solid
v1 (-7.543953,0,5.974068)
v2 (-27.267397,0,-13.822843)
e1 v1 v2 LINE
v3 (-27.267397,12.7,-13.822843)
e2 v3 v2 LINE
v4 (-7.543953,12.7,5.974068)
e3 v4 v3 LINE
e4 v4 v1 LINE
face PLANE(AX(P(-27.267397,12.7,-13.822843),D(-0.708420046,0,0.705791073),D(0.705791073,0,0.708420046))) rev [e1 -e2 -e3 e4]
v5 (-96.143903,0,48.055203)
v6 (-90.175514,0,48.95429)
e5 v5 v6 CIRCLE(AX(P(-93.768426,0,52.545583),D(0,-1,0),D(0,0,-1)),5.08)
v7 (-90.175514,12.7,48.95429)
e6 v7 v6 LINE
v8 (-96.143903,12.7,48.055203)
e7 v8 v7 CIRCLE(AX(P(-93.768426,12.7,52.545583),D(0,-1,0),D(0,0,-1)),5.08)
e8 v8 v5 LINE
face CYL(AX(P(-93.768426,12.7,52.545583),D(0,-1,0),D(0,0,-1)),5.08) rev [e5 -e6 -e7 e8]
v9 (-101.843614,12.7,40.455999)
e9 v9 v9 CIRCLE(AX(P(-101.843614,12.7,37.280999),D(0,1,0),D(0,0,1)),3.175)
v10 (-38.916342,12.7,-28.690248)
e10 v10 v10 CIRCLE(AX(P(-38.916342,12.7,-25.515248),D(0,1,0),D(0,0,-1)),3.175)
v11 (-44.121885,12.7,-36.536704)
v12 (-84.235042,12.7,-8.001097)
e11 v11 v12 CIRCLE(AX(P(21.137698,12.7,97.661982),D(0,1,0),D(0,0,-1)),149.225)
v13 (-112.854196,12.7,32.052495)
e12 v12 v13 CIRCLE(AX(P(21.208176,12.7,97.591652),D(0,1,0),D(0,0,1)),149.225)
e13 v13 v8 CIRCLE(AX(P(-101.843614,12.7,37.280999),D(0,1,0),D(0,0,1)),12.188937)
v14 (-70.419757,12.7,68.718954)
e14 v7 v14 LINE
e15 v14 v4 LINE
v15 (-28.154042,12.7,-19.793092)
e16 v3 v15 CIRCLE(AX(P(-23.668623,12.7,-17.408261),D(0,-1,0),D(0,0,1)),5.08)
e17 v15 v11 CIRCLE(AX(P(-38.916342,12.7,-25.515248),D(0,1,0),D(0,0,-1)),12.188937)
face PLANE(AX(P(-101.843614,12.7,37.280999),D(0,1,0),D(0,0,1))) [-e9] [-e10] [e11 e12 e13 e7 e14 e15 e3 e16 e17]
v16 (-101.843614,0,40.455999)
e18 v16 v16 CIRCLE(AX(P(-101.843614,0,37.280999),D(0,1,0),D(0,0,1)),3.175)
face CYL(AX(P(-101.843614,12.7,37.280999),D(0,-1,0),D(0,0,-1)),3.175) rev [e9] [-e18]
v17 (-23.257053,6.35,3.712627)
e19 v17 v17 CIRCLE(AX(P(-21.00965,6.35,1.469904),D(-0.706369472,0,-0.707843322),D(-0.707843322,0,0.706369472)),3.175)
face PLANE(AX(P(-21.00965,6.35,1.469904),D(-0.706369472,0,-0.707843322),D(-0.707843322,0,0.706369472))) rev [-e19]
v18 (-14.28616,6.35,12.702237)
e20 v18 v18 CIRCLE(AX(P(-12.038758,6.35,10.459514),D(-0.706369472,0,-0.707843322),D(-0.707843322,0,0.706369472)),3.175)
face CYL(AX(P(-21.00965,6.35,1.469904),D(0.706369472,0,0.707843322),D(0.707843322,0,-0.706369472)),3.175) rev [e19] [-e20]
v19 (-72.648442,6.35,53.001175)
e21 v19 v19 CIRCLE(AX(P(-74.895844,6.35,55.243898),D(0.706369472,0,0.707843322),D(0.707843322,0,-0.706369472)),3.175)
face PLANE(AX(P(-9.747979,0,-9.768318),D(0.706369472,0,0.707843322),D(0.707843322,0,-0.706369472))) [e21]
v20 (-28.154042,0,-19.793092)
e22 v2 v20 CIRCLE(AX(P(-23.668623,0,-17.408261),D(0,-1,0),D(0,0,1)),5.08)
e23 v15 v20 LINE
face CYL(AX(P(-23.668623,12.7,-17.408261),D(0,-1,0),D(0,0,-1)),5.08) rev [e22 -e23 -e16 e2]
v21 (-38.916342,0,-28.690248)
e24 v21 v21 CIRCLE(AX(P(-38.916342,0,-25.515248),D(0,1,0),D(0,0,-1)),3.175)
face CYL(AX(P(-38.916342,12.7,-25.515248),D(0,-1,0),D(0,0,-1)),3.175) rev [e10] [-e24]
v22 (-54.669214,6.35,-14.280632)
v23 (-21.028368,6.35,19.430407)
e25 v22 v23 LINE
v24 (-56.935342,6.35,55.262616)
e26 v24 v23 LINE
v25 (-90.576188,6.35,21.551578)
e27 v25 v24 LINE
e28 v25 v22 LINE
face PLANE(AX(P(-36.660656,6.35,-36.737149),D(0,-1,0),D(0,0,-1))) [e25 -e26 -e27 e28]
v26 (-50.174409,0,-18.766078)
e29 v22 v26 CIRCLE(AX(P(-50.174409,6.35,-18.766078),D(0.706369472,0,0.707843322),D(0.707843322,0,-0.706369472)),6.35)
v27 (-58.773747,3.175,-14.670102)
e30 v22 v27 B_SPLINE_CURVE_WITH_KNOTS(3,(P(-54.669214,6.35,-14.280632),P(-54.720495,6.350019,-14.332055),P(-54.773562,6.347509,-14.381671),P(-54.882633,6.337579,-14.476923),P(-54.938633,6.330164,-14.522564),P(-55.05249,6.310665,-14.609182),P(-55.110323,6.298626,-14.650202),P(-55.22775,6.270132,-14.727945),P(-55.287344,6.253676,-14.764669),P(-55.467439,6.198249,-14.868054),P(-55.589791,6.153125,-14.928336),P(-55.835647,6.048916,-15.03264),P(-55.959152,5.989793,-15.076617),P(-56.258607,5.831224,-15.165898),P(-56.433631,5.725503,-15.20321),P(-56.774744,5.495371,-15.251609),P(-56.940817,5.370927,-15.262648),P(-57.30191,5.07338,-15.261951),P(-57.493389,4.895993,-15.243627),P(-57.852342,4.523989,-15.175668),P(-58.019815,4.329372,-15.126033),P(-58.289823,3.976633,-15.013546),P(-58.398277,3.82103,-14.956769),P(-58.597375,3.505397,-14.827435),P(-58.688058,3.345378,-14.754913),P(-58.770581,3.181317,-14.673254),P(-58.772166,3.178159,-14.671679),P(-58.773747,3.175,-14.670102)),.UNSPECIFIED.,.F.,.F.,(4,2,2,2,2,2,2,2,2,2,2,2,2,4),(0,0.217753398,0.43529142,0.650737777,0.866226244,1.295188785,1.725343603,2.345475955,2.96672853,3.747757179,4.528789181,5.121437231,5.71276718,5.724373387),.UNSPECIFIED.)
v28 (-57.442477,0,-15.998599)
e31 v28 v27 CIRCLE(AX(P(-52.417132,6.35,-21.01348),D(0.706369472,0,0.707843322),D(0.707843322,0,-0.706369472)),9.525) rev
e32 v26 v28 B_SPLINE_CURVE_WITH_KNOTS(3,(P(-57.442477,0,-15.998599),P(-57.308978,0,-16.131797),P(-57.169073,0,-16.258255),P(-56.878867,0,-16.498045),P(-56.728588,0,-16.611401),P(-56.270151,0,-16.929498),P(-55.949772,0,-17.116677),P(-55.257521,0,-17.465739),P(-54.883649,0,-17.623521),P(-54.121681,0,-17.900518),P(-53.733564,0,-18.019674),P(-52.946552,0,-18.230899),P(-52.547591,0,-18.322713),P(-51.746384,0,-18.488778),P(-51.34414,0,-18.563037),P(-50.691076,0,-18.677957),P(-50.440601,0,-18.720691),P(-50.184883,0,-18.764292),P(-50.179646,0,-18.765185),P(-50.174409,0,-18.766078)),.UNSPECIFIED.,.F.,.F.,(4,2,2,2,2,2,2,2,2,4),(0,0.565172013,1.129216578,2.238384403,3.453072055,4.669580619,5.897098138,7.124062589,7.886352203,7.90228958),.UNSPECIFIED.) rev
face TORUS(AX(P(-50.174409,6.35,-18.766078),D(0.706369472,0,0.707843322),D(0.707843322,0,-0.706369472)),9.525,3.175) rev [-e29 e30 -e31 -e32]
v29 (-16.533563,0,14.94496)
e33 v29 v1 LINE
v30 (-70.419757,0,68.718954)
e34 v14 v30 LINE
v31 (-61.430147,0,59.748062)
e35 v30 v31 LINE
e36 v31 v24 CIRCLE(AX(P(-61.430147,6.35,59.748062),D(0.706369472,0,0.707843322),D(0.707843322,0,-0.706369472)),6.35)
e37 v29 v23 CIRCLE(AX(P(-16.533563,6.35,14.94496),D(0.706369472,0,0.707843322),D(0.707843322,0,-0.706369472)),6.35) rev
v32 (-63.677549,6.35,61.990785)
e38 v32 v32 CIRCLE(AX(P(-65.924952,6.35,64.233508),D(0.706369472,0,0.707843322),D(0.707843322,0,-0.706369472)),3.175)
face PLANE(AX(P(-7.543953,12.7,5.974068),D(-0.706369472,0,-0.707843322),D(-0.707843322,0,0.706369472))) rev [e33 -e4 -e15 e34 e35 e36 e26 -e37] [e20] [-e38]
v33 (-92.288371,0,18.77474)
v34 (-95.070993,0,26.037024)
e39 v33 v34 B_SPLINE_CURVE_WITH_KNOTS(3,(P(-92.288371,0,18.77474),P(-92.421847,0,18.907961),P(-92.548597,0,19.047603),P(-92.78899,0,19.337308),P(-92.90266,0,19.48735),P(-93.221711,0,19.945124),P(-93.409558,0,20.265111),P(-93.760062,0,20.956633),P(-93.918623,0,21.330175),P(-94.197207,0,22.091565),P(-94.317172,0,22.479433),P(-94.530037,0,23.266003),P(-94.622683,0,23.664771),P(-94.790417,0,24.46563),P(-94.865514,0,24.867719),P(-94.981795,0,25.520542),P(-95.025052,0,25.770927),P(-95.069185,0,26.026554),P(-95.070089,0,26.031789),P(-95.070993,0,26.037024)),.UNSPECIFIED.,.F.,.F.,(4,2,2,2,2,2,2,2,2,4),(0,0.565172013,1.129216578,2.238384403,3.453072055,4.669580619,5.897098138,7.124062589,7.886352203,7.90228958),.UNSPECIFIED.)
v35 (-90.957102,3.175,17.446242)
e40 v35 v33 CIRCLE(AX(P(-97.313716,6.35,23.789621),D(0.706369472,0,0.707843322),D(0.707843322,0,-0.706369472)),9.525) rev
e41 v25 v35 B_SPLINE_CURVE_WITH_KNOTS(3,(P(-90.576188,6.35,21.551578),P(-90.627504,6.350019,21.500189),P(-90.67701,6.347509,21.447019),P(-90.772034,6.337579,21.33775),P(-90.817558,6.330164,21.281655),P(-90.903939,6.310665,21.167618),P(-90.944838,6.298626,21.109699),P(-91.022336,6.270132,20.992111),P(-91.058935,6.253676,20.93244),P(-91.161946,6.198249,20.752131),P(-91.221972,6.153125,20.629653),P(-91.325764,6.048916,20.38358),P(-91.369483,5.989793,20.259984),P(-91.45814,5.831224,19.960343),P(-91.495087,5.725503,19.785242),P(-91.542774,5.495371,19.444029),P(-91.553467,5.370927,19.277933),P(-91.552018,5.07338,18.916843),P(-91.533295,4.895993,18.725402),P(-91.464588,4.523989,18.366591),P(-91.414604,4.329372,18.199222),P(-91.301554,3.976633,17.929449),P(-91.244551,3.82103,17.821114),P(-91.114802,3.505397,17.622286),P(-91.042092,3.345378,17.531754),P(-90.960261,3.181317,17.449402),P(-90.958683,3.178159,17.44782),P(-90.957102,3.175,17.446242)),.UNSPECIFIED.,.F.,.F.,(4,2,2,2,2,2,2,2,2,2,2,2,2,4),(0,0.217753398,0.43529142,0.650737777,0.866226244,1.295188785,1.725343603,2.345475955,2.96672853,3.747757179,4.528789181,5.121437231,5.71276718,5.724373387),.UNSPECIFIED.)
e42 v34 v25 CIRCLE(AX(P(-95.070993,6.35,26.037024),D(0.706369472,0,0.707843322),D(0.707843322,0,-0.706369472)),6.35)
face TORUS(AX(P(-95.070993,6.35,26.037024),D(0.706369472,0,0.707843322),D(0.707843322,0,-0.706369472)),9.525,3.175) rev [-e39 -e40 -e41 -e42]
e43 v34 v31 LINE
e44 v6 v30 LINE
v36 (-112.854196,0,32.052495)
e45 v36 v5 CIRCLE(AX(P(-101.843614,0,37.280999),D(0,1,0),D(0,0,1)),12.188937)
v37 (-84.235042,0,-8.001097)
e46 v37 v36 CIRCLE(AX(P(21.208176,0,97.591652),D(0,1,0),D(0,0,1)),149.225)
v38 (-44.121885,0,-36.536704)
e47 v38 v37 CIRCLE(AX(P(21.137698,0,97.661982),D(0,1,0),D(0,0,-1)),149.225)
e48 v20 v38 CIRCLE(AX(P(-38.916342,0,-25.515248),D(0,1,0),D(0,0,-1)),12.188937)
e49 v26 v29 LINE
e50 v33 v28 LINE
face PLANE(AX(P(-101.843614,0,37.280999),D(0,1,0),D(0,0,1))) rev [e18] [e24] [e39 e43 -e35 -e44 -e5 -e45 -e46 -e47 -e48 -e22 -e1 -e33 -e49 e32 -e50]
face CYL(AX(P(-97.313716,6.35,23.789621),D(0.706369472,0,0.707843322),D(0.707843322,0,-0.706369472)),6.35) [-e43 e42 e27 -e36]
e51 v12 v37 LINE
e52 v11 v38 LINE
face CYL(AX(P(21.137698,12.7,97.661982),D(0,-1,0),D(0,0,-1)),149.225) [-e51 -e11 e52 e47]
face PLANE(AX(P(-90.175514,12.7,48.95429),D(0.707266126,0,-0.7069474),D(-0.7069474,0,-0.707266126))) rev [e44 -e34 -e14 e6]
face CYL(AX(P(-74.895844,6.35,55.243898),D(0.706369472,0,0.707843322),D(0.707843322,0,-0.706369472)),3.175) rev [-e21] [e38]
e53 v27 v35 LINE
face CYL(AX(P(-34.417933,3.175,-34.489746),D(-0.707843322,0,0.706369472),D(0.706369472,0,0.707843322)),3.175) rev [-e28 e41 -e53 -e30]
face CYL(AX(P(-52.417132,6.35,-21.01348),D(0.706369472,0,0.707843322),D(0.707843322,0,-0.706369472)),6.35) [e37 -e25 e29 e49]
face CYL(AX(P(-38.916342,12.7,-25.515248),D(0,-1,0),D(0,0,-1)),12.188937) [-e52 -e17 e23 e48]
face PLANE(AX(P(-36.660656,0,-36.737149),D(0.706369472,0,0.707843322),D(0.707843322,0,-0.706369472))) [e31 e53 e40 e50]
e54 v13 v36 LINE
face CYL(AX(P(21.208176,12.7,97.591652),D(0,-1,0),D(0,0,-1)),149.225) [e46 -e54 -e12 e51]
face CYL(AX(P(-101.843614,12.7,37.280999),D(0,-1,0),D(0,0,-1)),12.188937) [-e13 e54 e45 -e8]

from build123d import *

# Parameters (mm, degrees)
SKETCH10_R                   = 3.175
BOSS_EXTRUDE1_DEPTH          = 12.7
SKETCH13_R                   = 3.175
TAPPED_HOLE_FOR_LID_DEPTH    = 12.7
CUT_TO_DECREASE_MASS_DEPTH   = 50.8
EIGTH_INCH_INTERNAL_FILLET_R = 3.175


with BuildPart() as part:
    # Sketch10 → Boss-Extrude1 (new body)
    with BuildSketch(Plane(origin=(0, 0, 0), x_dir=(1, 0, 0), z_dir=(0, 1, 0))):
        with BuildLine():
            Line((-7.543952838, -5.974068145), (-70.419757016, -68.718954232))
            Line((-70.419757016, -68.718954232), (-90.175514458, -48.954289951))
            ThreePointArc((-90.175514458, -48.954289951), (-93.011705319, -47.522259817), (-96.143902741, -48.0552028))
            ThreePointArc((-96.143902741, -48.0552028), (-110.274094487, -46.08424648), (-112.854196125, -32.052494517))
            ThreePointArc((-112.854196125, -32.052494517), (-100.207656711, -10.837422412), (-84.235041656, 8.001096953))
            ThreePointArc((-84.235041656, 8.001096953), (-65.363270894, 23.934411483), (-44.121885218, 36.536704058))
            ThreePointArc((-44.121885218, 36.536704058), (-30.095541538, 33.92736112), (-28.154041586, 19.79309193))
            ThreePointArc((-28.154041586, 19.79309193), (-28.693511967, 16.662012146), (-27.267396522, 13.822842611))
            Line((-27.267396522, 13.822842611), (-7.543952838, -5.974068145))
        make_face()
        with Locations(Location((-101.843613637, -37.280998562, 0), (0, 0, 270))):
            Circle(SKETCH10_R, mode=Mode.SUBTRACT)
        with Locations(Location((-38.9163423, 25.515247521, 0), (0, 0, 90))):
            Circle(SKETCH10_R, mode=Mode.SUBTRACT)
    extrude(amount=BOSS_EXTRUDE1_DEPTH)

    # Sketch13 → Tapped Hole for Lid (cut)
    with BuildSketch(Plane(origin=(-0.777086764, 0, -0.778708166), x_dir=(0.7078433221233256, 0, -0.7063694722490589), z_dir=(0.7063694722490589, 0, 0.7078433221233256))):
        with BuildLine():
            ThreePointArc((-88.862126184, 6.35), (-90.822106286, 9.283317516), (-94.282190214, 8.59506403))
            Line((-94.282190214, 8.59506403), (-89.792062153, 4.10493597))
            ThreePointArc((-89.792062153, 4.10493597), (-89.103808668, 5.134980102), (-88.862126184, 6.35))
        make_face()
        with BuildLine():
            Line((-89.792062153, 4.10493597), (-94.282190214, 8.59506403))
            ThreePointArc((-94.282190214, 8.59506403), (-94.282190214, 4.10493597), (-89.792062153, 4.10493597))
        make_face()
        with Locations(Location((-15.909836001, 6.35, 0), (0, 0, 180))):
            Circle(SKETCH13_R)
    extrude(amount=-TAPPED_HOLE_FOR_LID_DEPTH, mode=Mode.SUBTRACT)

    # Sketch14 → Cut to Decrease Mass (cut)
    with BuildSketch(Plane(origin=(-0.777086764, 0, -0.778708166), x_dir=(0.7078433221233256, 0, -0.7063694722490589), z_dir=(0.7063694722490589, 0, 0.7078433221233256))):
        with BuildLine():
            ThreePointArc((-79.337126184, 6.35), (-81.196998123, 1.859871939), (-85.687126184, 0))
            Line((-85.687126184, 0), (-22.259836001, 0))
            ThreePointArc((-22.259836001, 0), (-26.749964062, 1.859871939), (-28.609836001, 6.35))
            Line((-28.609836001, 6.35), (-79.337126184, 6.35))
        make_face()
    extrude(amount=-CUT_TO_DECREASE_MASS_DEPTH, mode=Mode.SUBTRACT)

    # Eigth Inch Internal Fillet
    # the kernel refuses this fillet: 3.175 mm, written as the material it adds along each edge
    with BuildSketch(Plane(origin=(-52.417132219, 6.35, -21.013480322), x_dir=(0.6718444169056685, -0.3148458040869803, -0.670445522858871), z_dir=(0.22286149992151785, 0.9491428341660821, -0.22239746447275088))) as eigth_inch_internal_fillet_piece_1_section:
        with BuildLine():
            CenterArc((6.35 + EIGTH_INCH_INTERNAL_FILLET_R, -EIGTH_INCH_INTERNAL_FILLET_R), EIGTH_INCH_INTERNAL_FILLET_R, 90, 90)
            Line((6.35 + EIGTH_INCH_INTERNAL_FILLET_R, 0), (6.35, 0))
            Line((6.35, 0), (6.35, -EIGTH_INCH_INTERNAL_FILLET_R))
        make_face()
    eigth_inch_internal_fillet_piece_1 = revolve(axis=Axis((-52.417132219, 6.35, -21.013480322), (-0.7063694722490589, 0, -0.7078433221233256)), revolution_arc=161.648494619, mode=Mode.PRIVATE)
    eigth_inch_internal_fillet_piece_1 = split(eigth_inch_internal_fillet_piece_1, bisect_by=Plane(origin=(-55.789501587, 0, -16.604615259), z_dir=(0, 1, 0)), keep=Keep.TOP, mode=Mode.PRIVATE)
    add(eigth_inch_internal_fillet_piece_1)
    with BuildSketch(Plane(origin=(-97.313716015, 6.35, 23.789621171), x_dir=(0.7078433221233247, 0, -0.7063694722490598), z_dir=(0, 1, 0))) as eigth_inch_internal_fillet_piece_2_section:
        with BuildLine():
            CenterArc((6.35 + EIGTH_INCH_INTERNAL_FILLET_R, -EIGTH_INCH_INTERNAL_FILLET_R), EIGTH_INCH_INTERNAL_FILLET_R, 90, 90)
            Line((6.35 + EIGTH_INCH_INTERNAL_FILLET_R, 0), (6.35, 0))
            Line((6.35, 0), (6.35, -EIGTH_INCH_INTERNAL_FILLET_R))
        make_face()
    eigth_inch_internal_fillet_piece_2 = revolve(axis=Axis((-97.313716015, 6.35, 23.789621171), (-0.7063694722490589, 0, -0.7078433221233256)), revolution_arc=161.648494619, mode=Mode.PRIVATE)
    eigth_inch_internal_fillet_piece_2 = split(eigth_inch_internal_fillet_piece_2, bisect_by=Plane(origin=(-92.897831362, 0, 20.426448518), z_dir=(0, 1, 0)), keep=Keep.TOP, mode=Mode.PRIVATE)
    add(eigth_inch_internal_fillet_piece_2)
    with BuildSketch(Plane(origin=(-51.293430945, 6.35, -22.134841859), x_dir=(0.7063694722490589, 0, 0.7078433221233255), z_dir=(-0.7078433221233256, 0, 0.7063694722490589))) as eigth_inch_internal_fillet_piece_3:
        with BuildLine():
            CenterArc((EIGTH_INCH_INTERNAL_FILLET_R, -EIGTH_INCH_INTERNAL_FILLET_R), EIGTH_INCH_INTERNAL_FILLET_R, 90, 90)
            Line((0, -EIGTH_INCH_INTERNAL_FILLET_R), (0, 0))
            Line((0, 0), (EIGTH_INCH_INTERNAL_FILLET_R, 0))
        make_face()
    extrude(amount=66.602290182)


solid = part.part
